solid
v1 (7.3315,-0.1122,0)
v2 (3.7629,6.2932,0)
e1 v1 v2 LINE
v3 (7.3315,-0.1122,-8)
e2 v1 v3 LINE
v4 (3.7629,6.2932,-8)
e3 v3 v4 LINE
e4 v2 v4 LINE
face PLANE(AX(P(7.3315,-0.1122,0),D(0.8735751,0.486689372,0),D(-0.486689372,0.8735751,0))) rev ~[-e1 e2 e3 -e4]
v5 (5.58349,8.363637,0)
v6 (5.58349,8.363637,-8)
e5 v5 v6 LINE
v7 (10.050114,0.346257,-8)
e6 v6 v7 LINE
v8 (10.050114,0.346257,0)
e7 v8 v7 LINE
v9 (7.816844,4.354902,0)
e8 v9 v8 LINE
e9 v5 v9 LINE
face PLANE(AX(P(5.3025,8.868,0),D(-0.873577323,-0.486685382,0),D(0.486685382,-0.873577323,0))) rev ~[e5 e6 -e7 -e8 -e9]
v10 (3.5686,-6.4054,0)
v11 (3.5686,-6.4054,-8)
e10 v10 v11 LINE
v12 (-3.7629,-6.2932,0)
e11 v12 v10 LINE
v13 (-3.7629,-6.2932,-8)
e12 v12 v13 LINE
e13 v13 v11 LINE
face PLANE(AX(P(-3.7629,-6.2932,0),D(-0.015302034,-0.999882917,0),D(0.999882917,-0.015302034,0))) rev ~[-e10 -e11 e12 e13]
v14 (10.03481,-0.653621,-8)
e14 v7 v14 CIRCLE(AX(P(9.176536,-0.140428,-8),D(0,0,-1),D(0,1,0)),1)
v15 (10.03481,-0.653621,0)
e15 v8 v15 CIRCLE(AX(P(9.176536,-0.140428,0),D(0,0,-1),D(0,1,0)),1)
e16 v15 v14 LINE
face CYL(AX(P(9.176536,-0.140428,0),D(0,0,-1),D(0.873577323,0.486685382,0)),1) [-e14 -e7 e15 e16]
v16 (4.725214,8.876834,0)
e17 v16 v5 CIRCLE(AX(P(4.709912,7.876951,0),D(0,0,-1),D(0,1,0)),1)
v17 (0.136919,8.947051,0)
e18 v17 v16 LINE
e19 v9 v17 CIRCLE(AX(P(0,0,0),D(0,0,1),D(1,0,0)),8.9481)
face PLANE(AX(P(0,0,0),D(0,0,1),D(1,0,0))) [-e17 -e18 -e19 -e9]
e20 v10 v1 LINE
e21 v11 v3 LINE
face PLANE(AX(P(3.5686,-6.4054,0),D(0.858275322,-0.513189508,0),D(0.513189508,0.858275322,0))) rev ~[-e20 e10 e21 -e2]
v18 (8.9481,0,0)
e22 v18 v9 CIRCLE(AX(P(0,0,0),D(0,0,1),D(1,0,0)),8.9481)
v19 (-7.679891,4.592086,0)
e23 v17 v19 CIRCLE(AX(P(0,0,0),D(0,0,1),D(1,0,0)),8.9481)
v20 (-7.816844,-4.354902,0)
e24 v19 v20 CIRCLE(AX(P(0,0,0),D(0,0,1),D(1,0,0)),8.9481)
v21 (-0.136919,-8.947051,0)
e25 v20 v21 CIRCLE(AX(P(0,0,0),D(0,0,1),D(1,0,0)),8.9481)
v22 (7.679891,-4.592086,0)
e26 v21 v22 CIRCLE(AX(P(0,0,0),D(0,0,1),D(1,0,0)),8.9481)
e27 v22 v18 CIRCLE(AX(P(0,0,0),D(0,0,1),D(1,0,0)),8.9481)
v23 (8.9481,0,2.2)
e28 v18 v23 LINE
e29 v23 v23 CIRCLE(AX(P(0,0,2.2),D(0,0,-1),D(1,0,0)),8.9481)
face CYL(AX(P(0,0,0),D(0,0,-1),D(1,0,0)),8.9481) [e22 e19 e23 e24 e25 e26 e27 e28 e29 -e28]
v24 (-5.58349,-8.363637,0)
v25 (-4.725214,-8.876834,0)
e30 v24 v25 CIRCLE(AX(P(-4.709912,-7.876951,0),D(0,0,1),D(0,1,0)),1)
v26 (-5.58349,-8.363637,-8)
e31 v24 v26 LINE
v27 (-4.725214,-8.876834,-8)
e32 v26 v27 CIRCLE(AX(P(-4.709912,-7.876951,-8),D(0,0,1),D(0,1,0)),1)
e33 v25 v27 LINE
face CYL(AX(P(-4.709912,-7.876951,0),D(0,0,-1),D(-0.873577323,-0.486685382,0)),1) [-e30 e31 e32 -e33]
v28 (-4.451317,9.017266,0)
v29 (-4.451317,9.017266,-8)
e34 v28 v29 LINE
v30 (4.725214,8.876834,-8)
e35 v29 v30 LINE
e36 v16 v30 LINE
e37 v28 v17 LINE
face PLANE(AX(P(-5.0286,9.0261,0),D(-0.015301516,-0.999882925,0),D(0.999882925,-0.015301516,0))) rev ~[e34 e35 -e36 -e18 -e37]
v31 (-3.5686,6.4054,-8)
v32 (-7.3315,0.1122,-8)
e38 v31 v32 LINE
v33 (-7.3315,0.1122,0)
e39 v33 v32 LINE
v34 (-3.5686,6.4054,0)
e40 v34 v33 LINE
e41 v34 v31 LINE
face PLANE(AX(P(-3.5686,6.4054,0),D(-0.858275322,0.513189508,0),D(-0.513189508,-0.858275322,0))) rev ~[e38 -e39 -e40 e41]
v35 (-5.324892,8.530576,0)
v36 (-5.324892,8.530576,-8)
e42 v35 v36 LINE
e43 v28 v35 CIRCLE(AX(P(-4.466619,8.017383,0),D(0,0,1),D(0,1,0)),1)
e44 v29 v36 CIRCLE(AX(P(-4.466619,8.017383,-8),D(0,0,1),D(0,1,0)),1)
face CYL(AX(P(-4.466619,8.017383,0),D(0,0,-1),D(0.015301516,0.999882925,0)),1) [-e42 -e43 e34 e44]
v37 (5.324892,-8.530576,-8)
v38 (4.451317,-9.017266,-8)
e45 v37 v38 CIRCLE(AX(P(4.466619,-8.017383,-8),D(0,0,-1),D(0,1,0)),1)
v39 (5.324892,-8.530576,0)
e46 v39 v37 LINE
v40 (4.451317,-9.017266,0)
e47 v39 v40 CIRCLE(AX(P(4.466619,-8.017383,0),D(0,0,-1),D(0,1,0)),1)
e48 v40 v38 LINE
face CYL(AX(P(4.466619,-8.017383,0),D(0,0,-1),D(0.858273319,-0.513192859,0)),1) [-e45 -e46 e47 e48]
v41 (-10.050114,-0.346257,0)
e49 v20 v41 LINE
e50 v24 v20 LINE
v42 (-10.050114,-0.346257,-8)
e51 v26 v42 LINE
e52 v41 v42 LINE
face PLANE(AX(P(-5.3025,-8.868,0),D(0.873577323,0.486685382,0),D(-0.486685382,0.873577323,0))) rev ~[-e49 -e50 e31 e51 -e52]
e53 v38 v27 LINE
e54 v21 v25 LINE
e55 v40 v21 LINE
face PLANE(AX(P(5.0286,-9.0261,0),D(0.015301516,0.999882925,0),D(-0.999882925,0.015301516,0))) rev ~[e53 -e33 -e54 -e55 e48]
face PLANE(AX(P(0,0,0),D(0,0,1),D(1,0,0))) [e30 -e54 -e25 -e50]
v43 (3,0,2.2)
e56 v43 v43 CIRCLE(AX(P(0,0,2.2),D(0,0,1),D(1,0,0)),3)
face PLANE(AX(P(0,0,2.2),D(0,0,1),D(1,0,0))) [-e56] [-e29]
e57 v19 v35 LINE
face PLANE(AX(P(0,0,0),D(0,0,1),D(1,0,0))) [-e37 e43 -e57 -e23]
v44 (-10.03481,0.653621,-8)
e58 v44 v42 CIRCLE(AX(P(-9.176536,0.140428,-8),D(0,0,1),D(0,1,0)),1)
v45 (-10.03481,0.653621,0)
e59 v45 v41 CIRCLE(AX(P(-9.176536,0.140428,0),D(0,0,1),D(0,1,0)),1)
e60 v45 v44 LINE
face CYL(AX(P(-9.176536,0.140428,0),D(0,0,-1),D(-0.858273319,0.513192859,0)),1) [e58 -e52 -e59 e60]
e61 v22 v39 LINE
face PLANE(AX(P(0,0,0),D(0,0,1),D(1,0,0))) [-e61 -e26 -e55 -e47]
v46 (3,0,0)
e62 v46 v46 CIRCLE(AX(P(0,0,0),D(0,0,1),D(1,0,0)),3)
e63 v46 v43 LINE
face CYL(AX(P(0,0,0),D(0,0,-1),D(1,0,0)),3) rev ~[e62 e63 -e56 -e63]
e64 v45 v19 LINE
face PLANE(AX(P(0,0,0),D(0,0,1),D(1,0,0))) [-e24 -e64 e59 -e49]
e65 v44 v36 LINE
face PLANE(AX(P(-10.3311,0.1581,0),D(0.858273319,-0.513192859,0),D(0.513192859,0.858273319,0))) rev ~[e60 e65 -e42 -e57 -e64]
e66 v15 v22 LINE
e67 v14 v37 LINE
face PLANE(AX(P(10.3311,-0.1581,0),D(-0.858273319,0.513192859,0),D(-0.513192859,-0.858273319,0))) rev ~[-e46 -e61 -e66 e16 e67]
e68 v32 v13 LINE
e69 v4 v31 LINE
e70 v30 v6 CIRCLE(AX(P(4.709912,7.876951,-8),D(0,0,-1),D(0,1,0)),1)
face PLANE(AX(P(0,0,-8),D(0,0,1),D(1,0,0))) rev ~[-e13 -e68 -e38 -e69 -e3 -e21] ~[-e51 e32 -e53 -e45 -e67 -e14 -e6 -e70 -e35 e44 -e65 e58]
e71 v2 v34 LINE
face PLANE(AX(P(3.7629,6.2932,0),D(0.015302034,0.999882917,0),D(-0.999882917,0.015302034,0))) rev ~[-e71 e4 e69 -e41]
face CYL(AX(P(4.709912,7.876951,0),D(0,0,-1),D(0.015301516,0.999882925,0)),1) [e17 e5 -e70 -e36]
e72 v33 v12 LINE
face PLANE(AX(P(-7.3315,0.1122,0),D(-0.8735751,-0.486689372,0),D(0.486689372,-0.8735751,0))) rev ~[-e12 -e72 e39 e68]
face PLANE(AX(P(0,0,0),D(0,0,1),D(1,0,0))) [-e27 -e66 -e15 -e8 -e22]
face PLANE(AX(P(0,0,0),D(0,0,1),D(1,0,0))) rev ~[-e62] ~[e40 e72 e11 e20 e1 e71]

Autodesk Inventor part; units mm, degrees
ref_plane "YZ Plane" through (0, 0, 0) normal (1, 0, 0) x (0, 1, 0)
ref_plane "XZ Plane" through (0, 0, 0) normal (0, 1, 0) x (-1, 0, 0)
ref_plane "XY Plane" through (0, 0, 0) normal (0, 0, 1) x (1, 0, 0)
sketch "Sketch2" plane through (0, 0, 0) normal (0, 0, 1) x (1, 0, 0)
  line L0 (3.7629, 6.2932) -> (-3.5686, 6.4054) projected
  line L1 (-3.5686, 6.4054) -> (-7.3315, 0.1122) projected
  line L2 (-7.3315, 0.1122) -> (-3.7629, -6.2932) projected
  line L3 (-3.7629, -6.2932) -> (3.5686, -6.4054) projected
  line L4 (3.5686, -6.4054) -> (7.3315, -0.1122) projected
  line L5 (7.3315, -0.1122) -> (3.7629, 6.2932) projected
  line L6 (3.5686, -6.4054) -> (-3.5686, 6.4054)
  line L7 (-3.5686, 6.4054) -> (-5.0286, 9.0261)
  line L8 (7.3315, -0.1122) -> (-7.3315, 0.1122)
  line L9 (-5.0286, 9.0261) -> (5.3025, 8.868)
  line L10 (5.3025, 8.868) -> (10.3311, -0.1581)
  line L11 (10.3311, -0.1581) -> (5.0286, -9.0261)
  line L12 (5.0286, -9.0261) -> (-5.3025, -8.868)
  line L13 (-5.3025, -8.868) -> (-10.3311, 0.1581)
  line L14 (-10.3311, 0.1581) -> (-5.0286, 9.0261)
  line L15 (-3.5686, 6.4054) -> (3.7629, 6.2932)
  line L16 (3.7629, 6.2932) -> (7.3315, -0.1122)
  line L17 (7.3315, -0.1122) -> (3.5686, -6.4054)
  line L18 (3.5686, -6.4054) -> (-3.7629, -6.2932)
  line L19 (-3.7629, -6.2932) -> (-7.3315, 0.1122)
  line L20 (-7.3315, 0.1122) -> (-3.5686, 6.4054)
  point P0 (0, 0)
  point P1 (0, 0)
  point P2 (0, 0)
  dimension "d0" = 3
extrude "Extrusion1" add sketch "Sketch2" against normal blind 8
sketch "Sketch3" plane through (0, 0, 0) normal (0, 0, 1) x (1, 0, 0)
  line L0 (-5.0286, 9.0261) -> (-10.3311, 0.1581) projected
  line L1 (-5.3025, -8.868) -> (5.0286, -9.0261) projected
  line L2 (10.3311, -0.1581) -> (5.3025, 8.868) projected
  circle A0 centre (0, 0) radius 8.9481
  circle A1 centre (0, 0) radius 3
  point P0 (0, 0)
  dimension "d3" = 6
extrude "Extrusion2" add sketch "Sketch3" along normal blind 2.2
fillet "Fillet1" radius 1 6 edges at (-5.3025, -8.868, -4) (-10.3311, 0.1581, -4) (-5.0286, 9.0261, -4) (5.3025, 8.868, -4) (10.3311, -0.1581, -4) (5.0286, -9.0261, -4)
properties part number "MagnetHolder 6mm"
